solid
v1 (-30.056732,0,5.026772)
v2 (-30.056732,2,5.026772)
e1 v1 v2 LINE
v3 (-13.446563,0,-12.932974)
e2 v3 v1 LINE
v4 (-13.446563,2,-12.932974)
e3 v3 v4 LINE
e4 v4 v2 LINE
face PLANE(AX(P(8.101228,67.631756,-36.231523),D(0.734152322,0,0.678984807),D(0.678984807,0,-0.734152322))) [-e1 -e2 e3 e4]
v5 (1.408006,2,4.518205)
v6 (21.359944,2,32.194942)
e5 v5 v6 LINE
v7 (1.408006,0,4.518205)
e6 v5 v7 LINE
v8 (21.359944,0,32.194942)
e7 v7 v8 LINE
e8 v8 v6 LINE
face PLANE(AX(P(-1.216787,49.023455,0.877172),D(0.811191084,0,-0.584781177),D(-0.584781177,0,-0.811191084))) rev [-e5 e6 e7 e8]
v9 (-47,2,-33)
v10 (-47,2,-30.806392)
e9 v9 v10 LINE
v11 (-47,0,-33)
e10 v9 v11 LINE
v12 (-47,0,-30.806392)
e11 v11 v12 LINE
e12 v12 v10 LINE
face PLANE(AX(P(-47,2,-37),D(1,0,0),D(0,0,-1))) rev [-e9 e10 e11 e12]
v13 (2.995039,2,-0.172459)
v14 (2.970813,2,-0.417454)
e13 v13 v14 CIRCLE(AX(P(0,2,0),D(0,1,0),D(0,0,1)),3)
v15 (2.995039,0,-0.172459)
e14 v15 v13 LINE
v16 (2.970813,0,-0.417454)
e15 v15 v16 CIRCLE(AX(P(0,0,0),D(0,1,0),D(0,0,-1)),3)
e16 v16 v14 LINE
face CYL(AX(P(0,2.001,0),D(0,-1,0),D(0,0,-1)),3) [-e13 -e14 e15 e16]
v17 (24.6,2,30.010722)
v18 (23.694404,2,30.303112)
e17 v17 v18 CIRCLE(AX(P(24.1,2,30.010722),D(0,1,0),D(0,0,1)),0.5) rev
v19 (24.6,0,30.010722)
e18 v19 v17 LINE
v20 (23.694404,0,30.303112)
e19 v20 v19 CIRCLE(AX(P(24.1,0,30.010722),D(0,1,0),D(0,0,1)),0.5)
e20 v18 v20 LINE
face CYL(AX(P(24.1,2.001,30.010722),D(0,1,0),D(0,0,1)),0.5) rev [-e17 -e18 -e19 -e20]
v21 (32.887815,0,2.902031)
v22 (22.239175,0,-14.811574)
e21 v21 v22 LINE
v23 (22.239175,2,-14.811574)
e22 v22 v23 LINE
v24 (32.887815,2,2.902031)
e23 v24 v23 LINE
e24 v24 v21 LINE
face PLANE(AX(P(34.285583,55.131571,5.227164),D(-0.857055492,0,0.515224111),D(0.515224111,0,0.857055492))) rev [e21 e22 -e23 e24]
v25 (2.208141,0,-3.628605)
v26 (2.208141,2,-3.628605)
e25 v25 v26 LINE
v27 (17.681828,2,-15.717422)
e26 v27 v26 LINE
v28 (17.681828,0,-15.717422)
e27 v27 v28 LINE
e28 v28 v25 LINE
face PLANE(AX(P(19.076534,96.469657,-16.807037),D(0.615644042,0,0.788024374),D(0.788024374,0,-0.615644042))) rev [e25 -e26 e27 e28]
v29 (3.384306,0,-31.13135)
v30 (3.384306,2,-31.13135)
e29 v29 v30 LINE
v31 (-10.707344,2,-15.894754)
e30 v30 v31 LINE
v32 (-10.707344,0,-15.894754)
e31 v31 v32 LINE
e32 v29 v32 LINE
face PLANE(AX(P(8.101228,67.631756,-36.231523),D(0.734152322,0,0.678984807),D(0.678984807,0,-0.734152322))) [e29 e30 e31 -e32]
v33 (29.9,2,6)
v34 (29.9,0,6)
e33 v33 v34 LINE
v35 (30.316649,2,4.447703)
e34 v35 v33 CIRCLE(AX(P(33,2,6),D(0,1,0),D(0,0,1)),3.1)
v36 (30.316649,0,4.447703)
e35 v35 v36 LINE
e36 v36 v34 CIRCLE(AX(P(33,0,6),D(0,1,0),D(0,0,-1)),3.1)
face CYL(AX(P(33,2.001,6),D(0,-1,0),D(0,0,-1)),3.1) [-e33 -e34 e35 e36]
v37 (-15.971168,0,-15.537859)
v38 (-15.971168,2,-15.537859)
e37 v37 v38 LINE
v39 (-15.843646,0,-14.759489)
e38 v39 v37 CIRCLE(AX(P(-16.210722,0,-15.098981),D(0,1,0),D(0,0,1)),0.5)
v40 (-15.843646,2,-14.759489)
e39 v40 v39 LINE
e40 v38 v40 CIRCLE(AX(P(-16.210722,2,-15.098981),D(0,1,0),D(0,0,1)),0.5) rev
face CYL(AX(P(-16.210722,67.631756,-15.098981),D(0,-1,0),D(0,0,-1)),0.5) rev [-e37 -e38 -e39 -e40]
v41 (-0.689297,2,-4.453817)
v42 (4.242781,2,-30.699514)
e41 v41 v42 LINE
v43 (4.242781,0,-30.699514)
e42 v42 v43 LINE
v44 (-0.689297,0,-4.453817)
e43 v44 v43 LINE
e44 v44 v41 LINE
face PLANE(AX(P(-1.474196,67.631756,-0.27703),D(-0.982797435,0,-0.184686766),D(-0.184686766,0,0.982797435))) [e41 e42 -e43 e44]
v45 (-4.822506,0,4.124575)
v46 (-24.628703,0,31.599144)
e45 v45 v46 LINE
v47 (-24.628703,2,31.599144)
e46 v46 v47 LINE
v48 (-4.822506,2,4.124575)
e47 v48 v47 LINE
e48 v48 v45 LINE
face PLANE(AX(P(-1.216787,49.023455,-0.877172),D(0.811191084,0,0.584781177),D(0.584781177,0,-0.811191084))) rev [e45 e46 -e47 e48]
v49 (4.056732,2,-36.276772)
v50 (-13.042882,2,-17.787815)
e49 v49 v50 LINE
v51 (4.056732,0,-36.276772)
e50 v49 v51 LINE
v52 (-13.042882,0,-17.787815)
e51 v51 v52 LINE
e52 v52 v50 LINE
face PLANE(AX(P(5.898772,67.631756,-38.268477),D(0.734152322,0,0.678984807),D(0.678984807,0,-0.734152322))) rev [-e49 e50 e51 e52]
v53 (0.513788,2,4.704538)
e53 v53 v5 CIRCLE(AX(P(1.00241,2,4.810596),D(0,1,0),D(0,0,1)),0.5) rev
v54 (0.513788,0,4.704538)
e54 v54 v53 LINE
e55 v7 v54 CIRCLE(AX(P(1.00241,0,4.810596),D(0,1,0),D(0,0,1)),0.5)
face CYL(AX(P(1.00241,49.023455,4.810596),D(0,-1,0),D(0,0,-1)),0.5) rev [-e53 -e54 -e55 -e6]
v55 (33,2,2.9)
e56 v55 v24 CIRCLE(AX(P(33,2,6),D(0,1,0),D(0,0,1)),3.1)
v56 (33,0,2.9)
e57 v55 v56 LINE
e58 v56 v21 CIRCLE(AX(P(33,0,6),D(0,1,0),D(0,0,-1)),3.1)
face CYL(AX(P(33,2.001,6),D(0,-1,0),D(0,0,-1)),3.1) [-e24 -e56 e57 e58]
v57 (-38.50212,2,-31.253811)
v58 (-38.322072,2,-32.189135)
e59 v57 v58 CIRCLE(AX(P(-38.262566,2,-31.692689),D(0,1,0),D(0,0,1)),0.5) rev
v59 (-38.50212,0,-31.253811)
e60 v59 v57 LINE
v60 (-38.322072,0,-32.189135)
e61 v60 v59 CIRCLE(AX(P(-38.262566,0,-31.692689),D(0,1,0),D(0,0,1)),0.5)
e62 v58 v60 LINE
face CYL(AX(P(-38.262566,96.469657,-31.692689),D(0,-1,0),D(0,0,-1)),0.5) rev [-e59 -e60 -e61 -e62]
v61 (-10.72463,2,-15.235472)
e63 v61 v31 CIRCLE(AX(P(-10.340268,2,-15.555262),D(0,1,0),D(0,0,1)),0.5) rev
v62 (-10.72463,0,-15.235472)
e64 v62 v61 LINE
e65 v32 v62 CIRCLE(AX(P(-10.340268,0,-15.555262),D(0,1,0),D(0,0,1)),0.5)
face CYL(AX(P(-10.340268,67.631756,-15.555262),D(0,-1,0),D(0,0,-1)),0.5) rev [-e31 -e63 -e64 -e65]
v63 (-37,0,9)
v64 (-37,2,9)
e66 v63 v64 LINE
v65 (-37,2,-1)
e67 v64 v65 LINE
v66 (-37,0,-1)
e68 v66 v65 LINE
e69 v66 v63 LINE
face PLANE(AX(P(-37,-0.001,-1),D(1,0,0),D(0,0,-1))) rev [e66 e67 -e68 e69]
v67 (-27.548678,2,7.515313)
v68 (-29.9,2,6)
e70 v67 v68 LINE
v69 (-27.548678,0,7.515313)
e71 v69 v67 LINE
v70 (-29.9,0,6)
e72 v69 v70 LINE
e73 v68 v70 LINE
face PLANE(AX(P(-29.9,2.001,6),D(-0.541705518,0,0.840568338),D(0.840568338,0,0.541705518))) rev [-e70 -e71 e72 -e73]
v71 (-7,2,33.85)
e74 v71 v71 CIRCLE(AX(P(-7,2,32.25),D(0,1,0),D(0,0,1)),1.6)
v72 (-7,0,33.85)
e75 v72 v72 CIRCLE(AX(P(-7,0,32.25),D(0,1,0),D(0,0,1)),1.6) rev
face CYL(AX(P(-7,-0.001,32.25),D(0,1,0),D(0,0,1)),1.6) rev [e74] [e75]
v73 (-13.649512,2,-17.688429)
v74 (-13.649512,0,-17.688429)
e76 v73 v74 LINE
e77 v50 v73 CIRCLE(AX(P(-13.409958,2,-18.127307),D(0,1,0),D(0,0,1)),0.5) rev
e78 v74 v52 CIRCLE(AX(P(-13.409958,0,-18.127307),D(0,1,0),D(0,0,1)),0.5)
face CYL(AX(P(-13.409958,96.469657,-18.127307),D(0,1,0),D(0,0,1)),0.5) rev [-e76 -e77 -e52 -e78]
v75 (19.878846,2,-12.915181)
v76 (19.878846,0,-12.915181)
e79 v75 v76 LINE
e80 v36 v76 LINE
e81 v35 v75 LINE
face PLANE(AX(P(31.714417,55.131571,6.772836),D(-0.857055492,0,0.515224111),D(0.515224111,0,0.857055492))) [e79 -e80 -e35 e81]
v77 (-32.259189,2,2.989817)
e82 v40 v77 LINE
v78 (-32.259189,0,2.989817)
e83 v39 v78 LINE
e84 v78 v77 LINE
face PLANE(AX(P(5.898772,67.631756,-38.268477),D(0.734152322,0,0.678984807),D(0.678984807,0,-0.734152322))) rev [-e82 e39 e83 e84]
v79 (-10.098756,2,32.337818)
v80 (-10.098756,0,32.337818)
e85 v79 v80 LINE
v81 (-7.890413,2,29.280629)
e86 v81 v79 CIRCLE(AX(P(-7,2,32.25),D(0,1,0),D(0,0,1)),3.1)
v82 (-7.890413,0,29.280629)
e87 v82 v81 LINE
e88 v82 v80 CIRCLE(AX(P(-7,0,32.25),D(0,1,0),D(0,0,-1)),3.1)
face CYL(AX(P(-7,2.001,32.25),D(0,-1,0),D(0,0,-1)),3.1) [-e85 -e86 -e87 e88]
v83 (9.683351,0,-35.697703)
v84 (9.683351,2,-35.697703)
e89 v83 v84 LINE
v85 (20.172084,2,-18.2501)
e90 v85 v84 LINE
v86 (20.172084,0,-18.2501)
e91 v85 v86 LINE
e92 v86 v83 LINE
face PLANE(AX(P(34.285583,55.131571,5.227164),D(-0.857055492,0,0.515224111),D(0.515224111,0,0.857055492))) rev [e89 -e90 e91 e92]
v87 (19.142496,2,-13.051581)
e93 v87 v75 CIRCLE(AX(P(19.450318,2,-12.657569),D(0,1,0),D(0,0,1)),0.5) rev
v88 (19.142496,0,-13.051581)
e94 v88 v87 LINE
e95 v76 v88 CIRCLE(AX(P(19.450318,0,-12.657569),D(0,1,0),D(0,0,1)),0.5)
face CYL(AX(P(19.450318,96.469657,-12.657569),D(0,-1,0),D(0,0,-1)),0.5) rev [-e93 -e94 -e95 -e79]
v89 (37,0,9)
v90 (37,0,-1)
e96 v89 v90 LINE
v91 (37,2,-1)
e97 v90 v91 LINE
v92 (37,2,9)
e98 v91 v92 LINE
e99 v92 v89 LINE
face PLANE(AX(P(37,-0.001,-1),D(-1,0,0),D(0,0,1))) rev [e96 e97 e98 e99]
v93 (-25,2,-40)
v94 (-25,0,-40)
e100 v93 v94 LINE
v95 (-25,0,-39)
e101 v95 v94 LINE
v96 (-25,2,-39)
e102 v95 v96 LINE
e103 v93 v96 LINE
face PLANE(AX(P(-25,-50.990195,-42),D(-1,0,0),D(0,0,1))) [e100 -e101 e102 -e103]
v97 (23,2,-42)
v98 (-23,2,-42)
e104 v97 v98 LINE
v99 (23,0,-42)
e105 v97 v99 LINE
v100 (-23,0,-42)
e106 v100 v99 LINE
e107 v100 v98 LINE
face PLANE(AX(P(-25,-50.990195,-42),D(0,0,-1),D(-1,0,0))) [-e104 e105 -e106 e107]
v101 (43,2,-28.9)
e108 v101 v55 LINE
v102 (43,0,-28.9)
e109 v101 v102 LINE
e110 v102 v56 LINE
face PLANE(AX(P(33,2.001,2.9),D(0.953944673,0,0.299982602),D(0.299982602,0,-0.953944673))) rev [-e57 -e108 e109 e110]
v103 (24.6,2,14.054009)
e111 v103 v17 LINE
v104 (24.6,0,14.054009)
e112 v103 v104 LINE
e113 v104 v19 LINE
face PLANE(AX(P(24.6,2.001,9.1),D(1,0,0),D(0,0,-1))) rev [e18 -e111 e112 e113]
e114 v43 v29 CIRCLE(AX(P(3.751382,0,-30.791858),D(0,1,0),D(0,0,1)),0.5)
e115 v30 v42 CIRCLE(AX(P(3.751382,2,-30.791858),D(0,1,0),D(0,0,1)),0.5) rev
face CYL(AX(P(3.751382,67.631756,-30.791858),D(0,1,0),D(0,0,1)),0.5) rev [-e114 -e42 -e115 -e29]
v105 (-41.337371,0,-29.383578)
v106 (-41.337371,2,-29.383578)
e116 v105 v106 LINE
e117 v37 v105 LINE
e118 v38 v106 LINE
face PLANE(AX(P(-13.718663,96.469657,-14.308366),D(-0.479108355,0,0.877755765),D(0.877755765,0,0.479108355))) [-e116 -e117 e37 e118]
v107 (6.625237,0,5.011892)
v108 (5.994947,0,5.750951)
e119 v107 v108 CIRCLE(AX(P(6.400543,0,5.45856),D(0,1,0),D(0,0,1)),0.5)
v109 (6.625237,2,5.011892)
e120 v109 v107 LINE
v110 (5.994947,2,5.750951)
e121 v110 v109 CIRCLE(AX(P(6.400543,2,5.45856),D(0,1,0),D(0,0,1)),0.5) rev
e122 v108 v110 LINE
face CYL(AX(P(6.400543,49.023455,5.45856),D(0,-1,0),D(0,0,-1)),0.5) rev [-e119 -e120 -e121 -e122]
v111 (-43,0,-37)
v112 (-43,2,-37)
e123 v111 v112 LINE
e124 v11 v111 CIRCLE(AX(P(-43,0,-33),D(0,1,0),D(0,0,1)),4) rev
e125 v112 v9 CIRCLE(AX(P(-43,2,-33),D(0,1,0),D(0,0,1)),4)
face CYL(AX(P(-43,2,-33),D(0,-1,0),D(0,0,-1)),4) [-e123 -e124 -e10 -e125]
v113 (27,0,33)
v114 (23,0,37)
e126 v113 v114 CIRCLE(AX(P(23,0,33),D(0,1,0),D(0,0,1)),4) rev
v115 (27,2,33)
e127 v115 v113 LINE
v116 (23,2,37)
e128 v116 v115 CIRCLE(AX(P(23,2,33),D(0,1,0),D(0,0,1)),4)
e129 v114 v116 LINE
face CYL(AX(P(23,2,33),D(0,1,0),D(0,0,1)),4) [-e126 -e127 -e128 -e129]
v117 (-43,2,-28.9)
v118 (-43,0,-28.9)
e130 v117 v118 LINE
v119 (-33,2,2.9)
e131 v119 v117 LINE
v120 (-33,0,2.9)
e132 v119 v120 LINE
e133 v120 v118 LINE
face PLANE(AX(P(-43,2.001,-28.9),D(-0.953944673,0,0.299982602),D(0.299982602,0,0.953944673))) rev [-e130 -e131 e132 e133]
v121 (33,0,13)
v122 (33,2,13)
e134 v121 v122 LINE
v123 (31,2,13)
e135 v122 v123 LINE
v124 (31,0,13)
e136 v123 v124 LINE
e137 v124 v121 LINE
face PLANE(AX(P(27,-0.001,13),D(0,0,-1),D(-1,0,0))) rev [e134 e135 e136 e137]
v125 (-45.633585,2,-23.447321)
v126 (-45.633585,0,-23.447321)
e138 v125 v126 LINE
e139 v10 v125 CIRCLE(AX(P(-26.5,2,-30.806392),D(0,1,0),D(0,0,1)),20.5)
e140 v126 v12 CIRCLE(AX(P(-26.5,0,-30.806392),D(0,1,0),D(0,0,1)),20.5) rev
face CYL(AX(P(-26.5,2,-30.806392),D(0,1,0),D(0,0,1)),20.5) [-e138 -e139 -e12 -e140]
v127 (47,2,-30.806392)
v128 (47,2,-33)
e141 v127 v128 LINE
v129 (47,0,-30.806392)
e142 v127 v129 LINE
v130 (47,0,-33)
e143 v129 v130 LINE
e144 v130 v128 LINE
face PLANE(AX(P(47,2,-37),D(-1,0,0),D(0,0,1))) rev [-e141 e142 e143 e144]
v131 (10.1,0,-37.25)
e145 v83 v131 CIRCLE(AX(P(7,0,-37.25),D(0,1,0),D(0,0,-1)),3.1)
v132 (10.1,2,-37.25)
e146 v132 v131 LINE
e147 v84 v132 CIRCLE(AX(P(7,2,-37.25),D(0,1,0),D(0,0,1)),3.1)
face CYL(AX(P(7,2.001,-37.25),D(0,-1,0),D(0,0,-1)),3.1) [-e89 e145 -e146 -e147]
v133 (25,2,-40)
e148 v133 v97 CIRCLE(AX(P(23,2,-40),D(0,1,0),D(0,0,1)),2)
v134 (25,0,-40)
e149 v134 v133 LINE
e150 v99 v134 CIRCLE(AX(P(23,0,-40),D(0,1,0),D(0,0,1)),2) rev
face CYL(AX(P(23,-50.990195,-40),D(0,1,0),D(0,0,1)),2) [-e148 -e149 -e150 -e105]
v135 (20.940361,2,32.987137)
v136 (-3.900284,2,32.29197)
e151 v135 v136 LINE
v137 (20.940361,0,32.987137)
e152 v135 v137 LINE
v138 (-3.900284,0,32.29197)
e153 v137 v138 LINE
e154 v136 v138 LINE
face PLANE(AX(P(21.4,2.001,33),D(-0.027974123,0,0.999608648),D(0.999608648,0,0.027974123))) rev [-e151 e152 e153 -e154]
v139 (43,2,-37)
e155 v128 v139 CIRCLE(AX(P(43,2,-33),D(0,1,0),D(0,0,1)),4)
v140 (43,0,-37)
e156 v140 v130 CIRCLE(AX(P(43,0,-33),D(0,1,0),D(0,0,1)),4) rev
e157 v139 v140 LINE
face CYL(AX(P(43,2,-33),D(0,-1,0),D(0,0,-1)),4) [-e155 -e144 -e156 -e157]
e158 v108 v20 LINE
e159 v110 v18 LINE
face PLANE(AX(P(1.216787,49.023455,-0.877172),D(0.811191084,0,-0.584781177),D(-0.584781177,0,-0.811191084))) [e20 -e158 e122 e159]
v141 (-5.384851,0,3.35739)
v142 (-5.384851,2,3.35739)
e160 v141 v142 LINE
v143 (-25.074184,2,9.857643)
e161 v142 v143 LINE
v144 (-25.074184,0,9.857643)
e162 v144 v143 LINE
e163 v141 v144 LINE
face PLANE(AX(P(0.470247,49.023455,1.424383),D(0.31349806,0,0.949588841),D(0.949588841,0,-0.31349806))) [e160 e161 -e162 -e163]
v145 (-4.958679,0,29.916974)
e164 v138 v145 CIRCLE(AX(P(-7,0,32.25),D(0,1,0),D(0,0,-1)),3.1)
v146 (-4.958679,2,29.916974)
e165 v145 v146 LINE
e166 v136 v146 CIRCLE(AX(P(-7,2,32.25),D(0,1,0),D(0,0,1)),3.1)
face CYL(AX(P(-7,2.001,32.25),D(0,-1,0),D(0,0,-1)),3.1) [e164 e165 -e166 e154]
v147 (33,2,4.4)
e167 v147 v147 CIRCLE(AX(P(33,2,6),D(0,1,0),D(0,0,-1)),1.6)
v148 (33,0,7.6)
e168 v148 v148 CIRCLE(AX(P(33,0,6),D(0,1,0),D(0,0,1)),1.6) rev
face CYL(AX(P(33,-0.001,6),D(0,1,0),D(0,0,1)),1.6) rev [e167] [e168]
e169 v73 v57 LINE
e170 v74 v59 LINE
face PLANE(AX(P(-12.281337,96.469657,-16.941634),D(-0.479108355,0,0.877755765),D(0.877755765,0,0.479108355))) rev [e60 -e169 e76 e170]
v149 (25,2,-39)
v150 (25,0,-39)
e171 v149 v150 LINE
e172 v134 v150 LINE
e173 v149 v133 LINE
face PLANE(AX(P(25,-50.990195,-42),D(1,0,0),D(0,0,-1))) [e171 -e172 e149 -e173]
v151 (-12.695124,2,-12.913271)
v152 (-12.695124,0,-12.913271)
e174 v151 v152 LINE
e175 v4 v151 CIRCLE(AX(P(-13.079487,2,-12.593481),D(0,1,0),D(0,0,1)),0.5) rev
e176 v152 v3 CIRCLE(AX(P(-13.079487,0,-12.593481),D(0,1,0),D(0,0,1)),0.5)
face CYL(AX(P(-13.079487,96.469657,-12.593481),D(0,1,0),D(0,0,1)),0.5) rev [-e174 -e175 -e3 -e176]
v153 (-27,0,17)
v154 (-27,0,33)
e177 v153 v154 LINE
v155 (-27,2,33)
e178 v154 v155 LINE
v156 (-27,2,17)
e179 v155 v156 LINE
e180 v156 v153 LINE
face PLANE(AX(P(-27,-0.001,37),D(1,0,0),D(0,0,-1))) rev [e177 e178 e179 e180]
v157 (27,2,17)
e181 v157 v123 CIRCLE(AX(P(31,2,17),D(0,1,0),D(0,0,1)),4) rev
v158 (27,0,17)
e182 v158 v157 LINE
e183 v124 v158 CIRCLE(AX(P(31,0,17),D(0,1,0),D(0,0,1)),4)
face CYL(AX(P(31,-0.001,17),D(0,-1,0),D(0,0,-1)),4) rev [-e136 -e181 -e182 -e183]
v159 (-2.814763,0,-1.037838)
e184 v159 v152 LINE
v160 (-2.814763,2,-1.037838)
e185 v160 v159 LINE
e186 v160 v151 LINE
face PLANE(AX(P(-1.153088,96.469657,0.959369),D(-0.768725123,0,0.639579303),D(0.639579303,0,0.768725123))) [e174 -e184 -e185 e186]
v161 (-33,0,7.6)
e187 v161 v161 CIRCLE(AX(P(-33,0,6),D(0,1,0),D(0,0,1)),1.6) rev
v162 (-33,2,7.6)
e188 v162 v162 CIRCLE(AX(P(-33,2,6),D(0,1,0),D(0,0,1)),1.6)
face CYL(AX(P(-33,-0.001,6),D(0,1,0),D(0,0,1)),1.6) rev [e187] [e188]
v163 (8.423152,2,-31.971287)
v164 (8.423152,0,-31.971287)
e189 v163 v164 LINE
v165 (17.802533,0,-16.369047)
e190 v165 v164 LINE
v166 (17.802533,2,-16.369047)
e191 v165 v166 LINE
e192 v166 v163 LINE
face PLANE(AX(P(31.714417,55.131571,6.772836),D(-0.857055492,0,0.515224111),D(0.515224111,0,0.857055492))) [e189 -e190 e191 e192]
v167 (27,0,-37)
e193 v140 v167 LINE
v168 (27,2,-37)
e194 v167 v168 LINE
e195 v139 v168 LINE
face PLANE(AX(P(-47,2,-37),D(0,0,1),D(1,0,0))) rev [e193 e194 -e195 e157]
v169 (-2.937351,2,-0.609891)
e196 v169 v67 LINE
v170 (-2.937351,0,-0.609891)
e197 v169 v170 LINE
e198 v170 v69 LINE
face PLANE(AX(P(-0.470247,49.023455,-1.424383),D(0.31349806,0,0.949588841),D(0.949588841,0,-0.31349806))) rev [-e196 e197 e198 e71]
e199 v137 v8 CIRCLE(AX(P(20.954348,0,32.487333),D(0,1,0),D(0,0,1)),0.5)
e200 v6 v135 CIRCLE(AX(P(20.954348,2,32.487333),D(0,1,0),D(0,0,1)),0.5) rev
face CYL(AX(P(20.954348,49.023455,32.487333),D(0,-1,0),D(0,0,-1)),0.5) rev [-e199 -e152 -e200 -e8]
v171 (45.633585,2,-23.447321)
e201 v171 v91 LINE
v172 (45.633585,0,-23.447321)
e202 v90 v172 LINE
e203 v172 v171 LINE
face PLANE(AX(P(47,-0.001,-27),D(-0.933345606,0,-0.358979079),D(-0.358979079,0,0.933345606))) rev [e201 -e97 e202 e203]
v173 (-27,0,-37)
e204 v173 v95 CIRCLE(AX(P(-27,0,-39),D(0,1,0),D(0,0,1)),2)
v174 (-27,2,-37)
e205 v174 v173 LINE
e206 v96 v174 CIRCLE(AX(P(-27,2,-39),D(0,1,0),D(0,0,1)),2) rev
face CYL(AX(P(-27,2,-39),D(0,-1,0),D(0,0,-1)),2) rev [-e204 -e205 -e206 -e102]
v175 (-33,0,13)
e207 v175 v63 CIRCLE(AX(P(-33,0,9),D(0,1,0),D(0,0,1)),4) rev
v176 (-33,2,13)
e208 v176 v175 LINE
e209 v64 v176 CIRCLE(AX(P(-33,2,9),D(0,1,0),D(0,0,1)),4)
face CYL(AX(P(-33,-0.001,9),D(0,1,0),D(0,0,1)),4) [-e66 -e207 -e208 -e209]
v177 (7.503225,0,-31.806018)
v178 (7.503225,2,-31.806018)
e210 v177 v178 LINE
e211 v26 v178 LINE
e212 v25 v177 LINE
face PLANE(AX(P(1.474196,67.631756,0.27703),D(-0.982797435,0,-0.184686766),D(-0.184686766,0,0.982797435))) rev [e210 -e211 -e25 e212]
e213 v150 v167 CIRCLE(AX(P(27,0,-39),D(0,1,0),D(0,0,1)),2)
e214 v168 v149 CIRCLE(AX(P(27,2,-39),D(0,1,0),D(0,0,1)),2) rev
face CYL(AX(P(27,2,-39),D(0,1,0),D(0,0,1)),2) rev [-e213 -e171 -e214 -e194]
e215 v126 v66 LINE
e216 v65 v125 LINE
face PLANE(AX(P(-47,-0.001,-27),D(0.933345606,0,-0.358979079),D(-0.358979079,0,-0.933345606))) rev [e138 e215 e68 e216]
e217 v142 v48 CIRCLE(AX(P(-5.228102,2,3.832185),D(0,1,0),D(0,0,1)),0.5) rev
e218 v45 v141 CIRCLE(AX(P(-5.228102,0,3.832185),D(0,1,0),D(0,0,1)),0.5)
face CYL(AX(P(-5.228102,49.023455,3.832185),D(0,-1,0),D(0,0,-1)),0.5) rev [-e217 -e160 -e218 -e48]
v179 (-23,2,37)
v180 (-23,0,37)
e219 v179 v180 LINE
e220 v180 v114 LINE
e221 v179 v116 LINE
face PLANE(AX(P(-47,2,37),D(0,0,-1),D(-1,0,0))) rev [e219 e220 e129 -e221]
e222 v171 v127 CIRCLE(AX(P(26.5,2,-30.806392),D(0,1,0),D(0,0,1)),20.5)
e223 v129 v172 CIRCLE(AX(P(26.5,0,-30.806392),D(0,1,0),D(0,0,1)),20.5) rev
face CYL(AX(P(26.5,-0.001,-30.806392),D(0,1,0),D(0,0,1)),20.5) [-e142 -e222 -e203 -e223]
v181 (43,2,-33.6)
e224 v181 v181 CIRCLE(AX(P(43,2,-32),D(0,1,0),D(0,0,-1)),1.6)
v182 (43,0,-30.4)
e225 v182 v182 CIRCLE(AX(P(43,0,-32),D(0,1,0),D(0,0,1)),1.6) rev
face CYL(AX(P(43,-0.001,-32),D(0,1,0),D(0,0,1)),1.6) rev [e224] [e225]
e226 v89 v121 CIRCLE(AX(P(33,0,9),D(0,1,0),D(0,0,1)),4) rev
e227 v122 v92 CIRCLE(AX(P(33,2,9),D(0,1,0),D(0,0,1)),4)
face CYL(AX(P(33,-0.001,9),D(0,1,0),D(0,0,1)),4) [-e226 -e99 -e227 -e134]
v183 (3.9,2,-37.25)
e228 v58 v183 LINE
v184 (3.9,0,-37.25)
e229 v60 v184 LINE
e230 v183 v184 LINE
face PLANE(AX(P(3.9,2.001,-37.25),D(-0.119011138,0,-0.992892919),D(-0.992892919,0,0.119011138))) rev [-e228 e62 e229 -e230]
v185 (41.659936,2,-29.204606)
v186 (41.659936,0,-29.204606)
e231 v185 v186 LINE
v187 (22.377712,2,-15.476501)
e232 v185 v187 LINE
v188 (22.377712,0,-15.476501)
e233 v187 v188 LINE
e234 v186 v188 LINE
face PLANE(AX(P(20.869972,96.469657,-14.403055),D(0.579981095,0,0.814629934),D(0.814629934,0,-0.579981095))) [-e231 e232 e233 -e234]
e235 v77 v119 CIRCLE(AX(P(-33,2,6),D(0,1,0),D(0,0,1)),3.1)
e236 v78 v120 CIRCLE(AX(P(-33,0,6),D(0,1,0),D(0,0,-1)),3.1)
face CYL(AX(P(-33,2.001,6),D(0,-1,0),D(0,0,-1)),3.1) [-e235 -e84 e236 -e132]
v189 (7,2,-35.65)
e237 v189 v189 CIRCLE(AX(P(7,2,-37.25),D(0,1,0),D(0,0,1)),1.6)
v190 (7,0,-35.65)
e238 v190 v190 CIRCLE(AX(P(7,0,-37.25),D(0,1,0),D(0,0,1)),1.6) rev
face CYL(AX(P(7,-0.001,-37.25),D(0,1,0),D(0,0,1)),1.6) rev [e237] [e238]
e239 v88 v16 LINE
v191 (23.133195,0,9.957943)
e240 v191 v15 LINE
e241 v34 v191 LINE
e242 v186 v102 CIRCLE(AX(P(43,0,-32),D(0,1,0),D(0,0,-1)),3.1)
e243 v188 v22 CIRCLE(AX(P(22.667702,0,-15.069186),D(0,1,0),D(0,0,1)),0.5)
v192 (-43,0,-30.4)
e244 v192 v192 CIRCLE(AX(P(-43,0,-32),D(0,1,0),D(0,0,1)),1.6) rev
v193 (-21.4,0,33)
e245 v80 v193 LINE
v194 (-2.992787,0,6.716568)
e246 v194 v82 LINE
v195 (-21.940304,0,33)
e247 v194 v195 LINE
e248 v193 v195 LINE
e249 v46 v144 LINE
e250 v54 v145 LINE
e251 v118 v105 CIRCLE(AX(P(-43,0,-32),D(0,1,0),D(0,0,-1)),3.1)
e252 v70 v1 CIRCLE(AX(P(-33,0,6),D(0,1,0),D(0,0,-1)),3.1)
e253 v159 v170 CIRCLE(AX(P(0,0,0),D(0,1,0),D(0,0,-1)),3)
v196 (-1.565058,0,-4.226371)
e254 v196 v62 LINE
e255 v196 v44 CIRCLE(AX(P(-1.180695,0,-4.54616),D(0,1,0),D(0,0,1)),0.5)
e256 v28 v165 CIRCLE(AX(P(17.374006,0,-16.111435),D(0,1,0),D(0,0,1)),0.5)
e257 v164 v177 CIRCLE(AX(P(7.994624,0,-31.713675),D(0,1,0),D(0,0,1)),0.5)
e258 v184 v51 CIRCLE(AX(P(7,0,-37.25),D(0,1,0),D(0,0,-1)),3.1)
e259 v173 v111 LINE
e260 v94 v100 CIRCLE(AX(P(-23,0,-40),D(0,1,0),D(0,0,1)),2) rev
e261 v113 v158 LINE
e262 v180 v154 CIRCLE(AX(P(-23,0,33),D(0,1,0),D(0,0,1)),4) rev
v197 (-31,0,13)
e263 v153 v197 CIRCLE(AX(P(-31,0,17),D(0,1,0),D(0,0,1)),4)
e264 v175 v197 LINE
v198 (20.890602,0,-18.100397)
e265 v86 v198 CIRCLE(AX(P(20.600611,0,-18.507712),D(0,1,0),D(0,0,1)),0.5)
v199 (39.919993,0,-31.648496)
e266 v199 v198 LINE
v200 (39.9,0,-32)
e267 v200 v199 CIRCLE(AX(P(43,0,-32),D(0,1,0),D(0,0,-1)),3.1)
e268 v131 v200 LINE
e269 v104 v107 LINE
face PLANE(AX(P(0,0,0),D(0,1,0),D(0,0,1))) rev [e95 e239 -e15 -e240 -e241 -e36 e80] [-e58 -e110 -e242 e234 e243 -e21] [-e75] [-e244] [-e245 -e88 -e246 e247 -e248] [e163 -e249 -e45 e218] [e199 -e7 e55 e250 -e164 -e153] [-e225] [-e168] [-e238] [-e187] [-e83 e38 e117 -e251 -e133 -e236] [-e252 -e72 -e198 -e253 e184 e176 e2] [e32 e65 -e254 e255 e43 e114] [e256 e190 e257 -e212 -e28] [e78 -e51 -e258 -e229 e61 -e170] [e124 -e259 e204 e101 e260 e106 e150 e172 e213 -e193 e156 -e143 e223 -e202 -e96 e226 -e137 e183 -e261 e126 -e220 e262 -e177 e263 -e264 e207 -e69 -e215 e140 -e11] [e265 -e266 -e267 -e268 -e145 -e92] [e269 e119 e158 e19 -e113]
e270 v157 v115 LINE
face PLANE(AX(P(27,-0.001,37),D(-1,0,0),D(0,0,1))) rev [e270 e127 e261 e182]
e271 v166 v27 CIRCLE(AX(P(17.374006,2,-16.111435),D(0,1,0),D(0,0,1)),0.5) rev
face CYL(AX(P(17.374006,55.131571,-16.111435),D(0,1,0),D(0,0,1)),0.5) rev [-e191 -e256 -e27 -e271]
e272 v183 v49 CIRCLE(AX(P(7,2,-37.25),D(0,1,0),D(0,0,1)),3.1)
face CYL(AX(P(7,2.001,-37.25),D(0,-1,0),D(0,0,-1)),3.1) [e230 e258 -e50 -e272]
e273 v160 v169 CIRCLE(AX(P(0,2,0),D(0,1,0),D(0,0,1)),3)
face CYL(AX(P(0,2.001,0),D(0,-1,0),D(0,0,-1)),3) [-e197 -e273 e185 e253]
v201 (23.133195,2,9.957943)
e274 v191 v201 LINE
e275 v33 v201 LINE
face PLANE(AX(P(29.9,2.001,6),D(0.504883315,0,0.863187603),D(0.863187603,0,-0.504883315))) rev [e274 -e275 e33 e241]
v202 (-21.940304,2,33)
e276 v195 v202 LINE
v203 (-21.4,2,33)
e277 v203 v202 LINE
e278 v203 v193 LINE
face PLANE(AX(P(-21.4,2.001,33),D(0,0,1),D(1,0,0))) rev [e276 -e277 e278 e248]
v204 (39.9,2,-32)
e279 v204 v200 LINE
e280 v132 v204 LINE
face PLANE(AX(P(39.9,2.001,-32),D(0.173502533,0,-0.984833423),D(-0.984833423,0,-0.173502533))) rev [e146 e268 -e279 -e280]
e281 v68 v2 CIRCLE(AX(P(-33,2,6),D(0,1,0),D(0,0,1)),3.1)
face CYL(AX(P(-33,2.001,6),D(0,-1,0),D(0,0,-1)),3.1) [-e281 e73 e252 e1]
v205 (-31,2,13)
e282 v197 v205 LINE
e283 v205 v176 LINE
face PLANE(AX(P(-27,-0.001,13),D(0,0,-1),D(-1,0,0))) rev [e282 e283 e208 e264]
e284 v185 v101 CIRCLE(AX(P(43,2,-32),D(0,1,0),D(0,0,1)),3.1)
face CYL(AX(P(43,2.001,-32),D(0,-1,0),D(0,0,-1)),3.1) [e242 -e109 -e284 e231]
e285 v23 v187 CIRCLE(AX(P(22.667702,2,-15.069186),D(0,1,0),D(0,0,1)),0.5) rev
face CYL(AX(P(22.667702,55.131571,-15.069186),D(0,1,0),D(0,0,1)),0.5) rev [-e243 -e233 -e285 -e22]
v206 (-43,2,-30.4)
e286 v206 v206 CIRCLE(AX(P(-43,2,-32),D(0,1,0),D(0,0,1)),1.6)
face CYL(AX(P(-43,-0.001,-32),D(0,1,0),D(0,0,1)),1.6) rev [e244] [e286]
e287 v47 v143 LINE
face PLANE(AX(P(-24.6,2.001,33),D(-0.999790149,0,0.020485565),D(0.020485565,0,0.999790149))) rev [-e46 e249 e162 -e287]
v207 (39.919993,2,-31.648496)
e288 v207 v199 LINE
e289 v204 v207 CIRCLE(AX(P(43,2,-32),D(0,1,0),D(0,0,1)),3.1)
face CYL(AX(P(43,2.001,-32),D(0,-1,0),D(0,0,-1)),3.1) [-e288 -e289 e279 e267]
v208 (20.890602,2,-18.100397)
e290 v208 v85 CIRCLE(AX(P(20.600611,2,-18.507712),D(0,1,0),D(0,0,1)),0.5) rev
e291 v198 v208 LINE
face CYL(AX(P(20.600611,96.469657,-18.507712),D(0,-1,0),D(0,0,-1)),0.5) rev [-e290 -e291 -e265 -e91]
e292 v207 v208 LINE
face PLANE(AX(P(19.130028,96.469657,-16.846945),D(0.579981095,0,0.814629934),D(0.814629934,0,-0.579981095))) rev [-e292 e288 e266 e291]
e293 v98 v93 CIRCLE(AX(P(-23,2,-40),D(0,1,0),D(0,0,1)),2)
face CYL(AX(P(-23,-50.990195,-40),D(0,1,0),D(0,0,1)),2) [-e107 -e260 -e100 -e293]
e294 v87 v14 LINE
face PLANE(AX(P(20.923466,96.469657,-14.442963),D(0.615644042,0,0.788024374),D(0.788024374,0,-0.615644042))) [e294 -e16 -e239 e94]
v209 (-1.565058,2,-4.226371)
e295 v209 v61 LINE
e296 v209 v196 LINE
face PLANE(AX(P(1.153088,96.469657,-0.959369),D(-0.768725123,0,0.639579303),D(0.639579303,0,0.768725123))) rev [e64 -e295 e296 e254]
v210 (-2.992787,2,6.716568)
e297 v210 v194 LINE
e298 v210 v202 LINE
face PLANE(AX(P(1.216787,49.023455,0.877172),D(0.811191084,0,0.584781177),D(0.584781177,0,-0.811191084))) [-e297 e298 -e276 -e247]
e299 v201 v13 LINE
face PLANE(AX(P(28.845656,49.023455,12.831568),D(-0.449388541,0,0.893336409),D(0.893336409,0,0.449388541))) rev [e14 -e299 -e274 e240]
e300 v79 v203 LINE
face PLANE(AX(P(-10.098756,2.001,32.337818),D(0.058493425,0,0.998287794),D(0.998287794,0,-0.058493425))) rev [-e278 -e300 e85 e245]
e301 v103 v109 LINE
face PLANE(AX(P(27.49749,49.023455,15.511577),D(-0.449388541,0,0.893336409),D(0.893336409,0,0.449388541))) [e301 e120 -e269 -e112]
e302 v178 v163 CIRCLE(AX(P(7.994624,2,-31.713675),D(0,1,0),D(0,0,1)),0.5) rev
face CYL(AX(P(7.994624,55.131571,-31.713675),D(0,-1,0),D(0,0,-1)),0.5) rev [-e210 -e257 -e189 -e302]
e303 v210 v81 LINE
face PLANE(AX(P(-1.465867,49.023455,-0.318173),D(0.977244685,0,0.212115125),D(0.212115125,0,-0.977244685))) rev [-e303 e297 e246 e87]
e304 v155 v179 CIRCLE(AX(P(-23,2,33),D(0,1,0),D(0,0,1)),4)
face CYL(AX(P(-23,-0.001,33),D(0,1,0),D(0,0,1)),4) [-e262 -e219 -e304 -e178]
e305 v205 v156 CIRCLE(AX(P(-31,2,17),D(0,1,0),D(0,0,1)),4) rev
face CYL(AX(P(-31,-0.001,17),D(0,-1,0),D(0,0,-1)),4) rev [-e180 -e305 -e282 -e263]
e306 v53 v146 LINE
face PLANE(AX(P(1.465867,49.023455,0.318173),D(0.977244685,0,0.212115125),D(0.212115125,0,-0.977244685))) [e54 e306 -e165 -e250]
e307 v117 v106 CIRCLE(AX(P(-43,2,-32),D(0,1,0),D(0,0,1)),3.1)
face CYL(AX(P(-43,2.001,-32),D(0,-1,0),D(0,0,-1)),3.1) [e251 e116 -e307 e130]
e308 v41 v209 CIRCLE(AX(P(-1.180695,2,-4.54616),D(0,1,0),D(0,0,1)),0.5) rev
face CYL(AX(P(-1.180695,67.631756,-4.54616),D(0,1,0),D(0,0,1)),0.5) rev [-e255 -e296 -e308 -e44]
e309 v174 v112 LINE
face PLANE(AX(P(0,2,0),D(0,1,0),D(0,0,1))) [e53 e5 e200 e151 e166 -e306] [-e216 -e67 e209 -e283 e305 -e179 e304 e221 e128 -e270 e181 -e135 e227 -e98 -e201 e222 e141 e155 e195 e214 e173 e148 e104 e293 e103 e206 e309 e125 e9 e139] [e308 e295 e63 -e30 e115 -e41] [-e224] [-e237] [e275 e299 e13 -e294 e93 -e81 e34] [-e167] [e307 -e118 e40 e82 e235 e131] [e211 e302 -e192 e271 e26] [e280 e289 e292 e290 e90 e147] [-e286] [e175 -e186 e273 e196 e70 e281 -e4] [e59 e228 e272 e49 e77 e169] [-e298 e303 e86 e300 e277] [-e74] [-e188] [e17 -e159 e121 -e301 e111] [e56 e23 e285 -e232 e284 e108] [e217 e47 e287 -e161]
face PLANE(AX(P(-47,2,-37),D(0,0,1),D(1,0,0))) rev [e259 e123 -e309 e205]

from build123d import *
from build123d.topology import SkipClean

# Parameters (mm, degrees)
SKETCH_1_W           = 94
SKETCH_1_H           = 74
EXTRUDE_1_DEPTH      = 2
CUT_EXTRUDE_1_REACH  = 61.85
SKETCH_2_R           = 1.6
CUT_EXTRUDE_2_REACH  = 61.85
CUT_EXTRUDE_3_REACH  = 61.85
SKETCH_4_W           = 10
SKETCH_4_H           = 24
FILLET_1_R           = 4
FILLET_2_R           = 4
CUT_EXTRUDE_4_REACH  = 61.85
SKETCH_5_R           = 1.6
SKETCH_7_W           = 50
SKETCH_7_H           = 10
EXTRUDE_2_DEPTH      = 2
FILLET_3_R           = 2
CUT_EXTRUDE_6_REACH  = 65.063
SKETCH_8_R           = 1.6
CUT_EXTRUDE_7_REACH  = 65.063
EXTRUDE_1_2_DEPTH    = 2
EXTRUDE_2_2_DEPTH    = 2
CUT_EXTRUDE_8_REACH  = 65.126
SKETCH_12_R          = 1.6
EXTRUDE_3_DEPTH      = 2
CUT_EXTRUDE_10_REACH = 65.126
EXTRUDE_START        = -2
EXTRUDE_4_DEPTH      = 2
EXTRUDE_3_2_DEPTH    = 2
CUT_EXTRUDE_11_REACH = 65.126
SKETCH_17_R          = 1.6
CUT_EXTRUDE_12_REACH = 65.126
SKETCH_18_R          = 1.6
CUT_EXTRUDE_START    = -2
CUT_EXTRUDE_13_DEPTH = 2
FILLET_4_R           = 0.5
FILLET_5_R           = 20.5


# Read off the part's stored shape, not the designer's step: 拉伸-薄壁4
with BuildPart() as part:
    # 草图1 → Extrude 1 (new body)
    with BuildSketch(Plane(origin=(0, 0, 0), x_dir=(1, 0, 0), z_dir=(0, 1, 0))):
        Rectangle(SKETCH_1_W, SKETCH_1_H)
    extrude(amount=EXTRUDE_1_DEPTH)

    # 草图2 → 切除-拉伸1 (cut, up to next)
    with BuildSketch(Plane(origin=(0, 2, 0), x_dir=(1, 0, 0), z_dir=(0, 1, 0)), mode=Mode.PRIVATE) as cut_extrude_1_sk1:
        with Locations(Location((-43, 32, 0), (0, 0, 270))):
            Circle(SKETCH_2_R)
    cut_extrude_1_tool1 = extrude(cut_extrude_1_sk1.sketch, amount=-CUT_EXTRUDE_1_REACH, mode=Mode.PRIVATE) & part.part
    # 草图2 → 切除-拉伸1 (cut, up to next)
    with BuildSketch(Plane(origin=(0, 2, 0), x_dir=(1, 0, 0), z_dir=(0, 1, 0)), mode=Mode.PRIVATE) as cut_extrude_1_sk2:
        with Locations(Location((43, 32, 0), (0, 0, 270))):
            Circle(SKETCH_2_R)
    cut_extrude_1_tool2 = extrude(cut_extrude_1_sk2.sketch, amount=-CUT_EXTRUDE_1_REACH, mode=Mode.PRIVATE) & part.part
    add(cut_extrude_1_tool1.solids().sort_by_distance((-43, 2, -32))[0], mode=Mode.SUBTRACT)
    add(cut_extrude_1_tool2.solids().sort_by_distance((43, 2, -32))[0], mode=Mode.SUBTRACT)

    # 草图3 → 切除-拉伸2 (cut, up to next)
    with BuildSketch(Plane(origin=(0, 2, 0), x_dir=(1, 0, 0), z_dir=(0, 1, 0)), mode=Mode.PRIVATE) as cut_extrude_2_sk1:
        Polygon((-47, 27), (-37, 1), (-37, -37), (-47, -37), align=None)
    cut_extrude_2_tool1 = extrude(cut_extrude_2_sk1.sketch, amount=-CUT_EXTRUDE_2_REACH, mode=Mode.PRIVATE) & part.part
    # 草图3 → 切除-拉伸2 (cut, up to next)
    with BuildSketch(Plane(origin=(0, 2, 0), x_dir=(1, 0, 0), z_dir=(0, 1, 0)), mode=Mode.PRIVATE) as cut_extrude_2_sk2:
        Polygon((37, -37), (47, -37), (47, 27), (37, 1), align=None)
    cut_extrude_2_tool2 = extrude(cut_extrude_2_sk2.sketch, amount=-CUT_EXTRUDE_2_REACH, mode=Mode.PRIVATE) & part.part
    add(cut_extrude_2_tool1.solids().sort_by_distance((-42.424837, 2, 10.947712))[0], mode=Mode.SUBTRACT)
    add(cut_extrude_2_tool2.solids().sort_by_distance((42.424837, 2, 10.947712))[0], mode=Mode.SUBTRACT)

    # 草图4 → 切除-拉伸3 (cut, up to next)
    with BuildSketch(Plane(origin=(0, 2, 0), x_dir=(1, 0, 0), z_dir=(0, 1, 0)), mode=Mode.PRIVATE) as cut_extrude_3_sk1:
        with Locations((-32, -25)):
            Rectangle(SKETCH_4_W, SKETCH_4_H)
    cut_extrude_3_tool1 = extrude(cut_extrude_3_sk1.sketch, amount=-CUT_EXTRUDE_3_REACH, mode=Mode.PRIVATE) & part.part
    # 草图4 → 切除-拉伸3 (cut, up to next)
    with BuildSketch(Plane(origin=(0, 2, 0), x_dir=(1, 0, 0), z_dir=(0, 1, 0)), mode=Mode.PRIVATE) as cut_extrude_3_sk2:
        with Locations((32, -25)):
            Rectangle(SKETCH_4_W, SKETCH_4_H)
    cut_extrude_3_tool2 = extrude(cut_extrude_3_sk2.sketch, amount=-CUT_EXTRUDE_3_REACH, mode=Mode.PRIVATE) & part.part
    add(cut_extrude_3_tool1.solids().sort_by_distance((-32, 2, 25))[0], mode=Mode.SUBTRACT)
    add(cut_extrude_3_tool2.solids().sort_by_distance((32, 2, 25))[0], mode=Mode.SUBTRACT)

    # 圆角1
    fillet_1_edges = [part.edges().sort_by_distance(p)[0] for p in [
        (-27, 1, 37),
        (27, 1, 37),
    ]]
    fillet(fillet_1_edges, radius=FILLET_1_R)

    # 圆角2
    fillet_2_edges = [part.edges().sort_by_distance(p)[0] for p in [
        (-37, 1, 13),
        (-27, 1, 13),
        (27, 1, 13),
        (37, 1, 13),
        (-47, 1, -37),
        (47, 1, -37),
    ]]
    fillet(fillet_2_edges, radius=FILLET_2_R)

    # 草图5 → 切除-拉伸4 (cut, up to next)
    with BuildSketch(Plane(origin=(0, 2, 0), x_dir=(1, 0, 0), z_dir=(0, 1, 0)), mode=Mode.PRIVATE) as cut_extrude_4_sk1:
        with Locations(Location((-33, -6, 0), (0, 0, 270))):
            Circle(SKETCH_5_R)
    cut_extrude_4_tool1 = extrude(cut_extrude_4_sk1.sketch, amount=-CUT_EXTRUDE_4_REACH, mode=Mode.PRIVATE) & part.part
    # 草图5 → 切除-拉伸4 (cut, up to next)
    with BuildSketch(Plane(origin=(0, 2, 0), x_dir=(1, 0, 0), z_dir=(0, 1, 0)), mode=Mode.PRIVATE) as cut_extrude_4_sk2:
        with Locations(Location((33, -6, 0), (0, 0, 270))):
            Circle(SKETCH_5_R)
    cut_extrude_4_tool2 = extrude(cut_extrude_4_sk2.sketch, amount=-CUT_EXTRUDE_4_REACH, mode=Mode.PRIVATE) & part.part
    add(cut_extrude_4_tool1.solids().sort_by_distance((-33, 2, 6))[0], mode=Mode.SUBTRACT)
    add(cut_extrude_4_tool2.solids().sort_by_distance((33, 2, 6))[0], mode=Mode.SUBTRACT)

    # 草图7 → Extrude 2 (add)
    with BuildSketch(Plane(origin=(0, 2, 0), x_dir=(1, 0, 0), z_dir=(0, 1, 0))):
        with Locations((0, 37)):
            Rectangle(SKETCH_7_W, SKETCH_7_H)
    extrude(amount=-EXTRUDE_2_DEPTH)

    # 圆角3
    fillet_3_edges = [part.edges().sort_by_distance(p)[0] for p in [
        (25, 1, -42),
        (25, 1, -37),
        (-25, 1, -37),
        (-25, 1, -42),
    ]]
    fillet(fillet_3_edges, radius=FILLET_3_R)

    # 草图8 → 切除-拉伸6 (cut, up to next)
    with BuildSketch(Plane(origin=(0, 2, 0), x_dir=(1, 0, 0), z_dir=(0, 1, 0)), mode=Mode.PRIVATE) as cut_extrude_6_sk1:
        with Locations(Location((7, 37.25, 0), (0, 0, 270))):
            Circle(SKETCH_8_R)
    cut_extrude_6_tool1 = extrude(cut_extrude_6_sk1.sketch, amount=-CUT_EXTRUDE_6_REACH, mode=Mode.PRIVATE) & part.part
    # 草图8 → 切除-拉伸6 (cut, up to next)
    with BuildSketch(Plane(origin=(0, 2, 0), x_dir=(1, 0, 0), z_dir=(0, 1, 0)), mode=Mode.PRIVATE) as cut_extrude_6_sk2:
        with Locations(Location((-7, -32.25, 0), (0, 0, 270))):
            Circle(SKETCH_8_R)
    cut_extrude_6_tool2 = extrude(cut_extrude_6_sk2.sketch, amount=-CUT_EXTRUDE_6_REACH, mode=Mode.PRIVATE) & part.part
    add(cut_extrude_6_tool1.solids().sort_by_distance((7, 2, -37.25))[0], mode=Mode.SUBTRACT)
    add(cut_extrude_6_tool2.solids().sort_by_distance((-7, 2, 32.25))[0], mode=Mode.SUBTRACT)

    # 草图9 → 切除-拉伸7 (cut, up to next)
    with BuildSketch(Plane.XZ, mode=Mode.PRIVATE) as cut_extrude_7_sk1:
        with BuildLine():
            Line((33, 2.9), (43, -28.9))
            ThreePointArc((43, -28.9), (40.807968978, -29.807968978), (39.9, -32))
            Line((39.9, -32), (10.1, -37.25))
            ThreePointArc((10.1, -37.25), (7, -34.15), (3.9, -37.25))
            Line((3.9, -37.25), (-39.9, -32))
            ThreePointArc((-39.9, -32), (-40.807968978, -29.807968978), (-43, -28.9))
            Line((-43, -28.9), (-33, 2.9))
            ThreePointArc((-33, 2.9), (-30.807968978, 3.807968978), (-29.9, 6))
            Line((-29.9, 6), (-3, 0))
            ThreePointArc((-3, 0), (0, -3), (3, 0))
            Line((3, 0), (29.9, 6))
            ThreePointArc((29.9, 6), (30.807968978, 3.807968978), (33, 2.9))
        make_face()
    cut_extrude_7_tool1 = extrude(cut_extrude_7_sk1.sketch, amount=-CUT_EXTRUDE_7_REACH, mode=Mode.PRIVATE) & part.part
    add(cut_extrude_7_tool1.solids().sort_by_distance((0.160682, 0, -16.717097))[0], mode=Mode.SUBTRACT)

    # 草图10 → Extrude 1 2 (add)
    with BuildSketch(Plane.XZ):
        Polygon((31.714416762, 6.772836166), (5.714416762, -36.477163834), (8.285583238, -38.022836166), (34.285583238, 5.227163834), align=None)
    extrude(amount=-EXTRUDE_1_2_DEPTH)

    # 草图11 → Extrude 2 2 (add)
    with BuildSketch(Plane.XZ):
        Polygon((-1.474196153, -0.277030149), (4.563536533, -32.406393368), (-31.898771517, 7.01847721), (-34.101228483, 4.98152279), (9.436463467, -42.093606632), (1.474196153, 0.277030149), align=None)
    extrude(amount=-EXTRUDE_2_2_DEPTH)

    # 草图12 → 切除-拉伸8 (cut, up to next)
    with BuildSketch(Plane.XZ, mode=Mode.PRIVATE) as cut_extrude_8_sk1:
        with Locations(Location((7, -37.25, 0), (0, 0, 90))):
            Circle(SKETCH_12_R)
    cut_extrude_8_tool1 = extrude(cut_extrude_8_sk1.sketch, amount=-CUT_EXTRUDE_8_REACH, mode=Mode.PRIVATE) & part.part
    # 草图12 → 切除-拉伸8 (cut, up to next)
    with BuildSketch(Plane.XZ, mode=Mode.PRIVATE) as cut_extrude_8_sk2:
        with Locations(Location((33, 6, 0), (0, 0, 90))):
            Circle(SKETCH_12_R)
    cut_extrude_8_tool2 = extrude(cut_extrude_8_sk2.sketch, amount=-CUT_EXTRUDE_8_REACH, mode=Mode.PRIVATE) & part.part
    # 草图12 → 切除-拉伸8 (cut, up to next)
    with BuildSketch(Plane.XZ, mode=Mode.PRIVATE) as cut_extrude_8_sk3:
        with Locations(Location((-33, 6, 0), (0, 0, 90))):
            Circle(SKETCH_12_R)
    cut_extrude_8_tool3 = extrude(cut_extrude_8_sk3.sketch, amount=-CUT_EXTRUDE_8_REACH, mode=Mode.PRIVATE) & part.part
    add(cut_extrude_8_tool1.solids().sort_by_distance((7, 0, -37.25))[0], mode=Mode.SUBTRACT)
    add(cut_extrude_8_tool2.solids().sort_by_distance((33, 0, 6))[0], mode=Mode.SUBTRACT)
    add(cut_extrude_8_tool3.solids().sort_by_distance((-33, 0, 6))[0], mode=Mode.SUBTRACT)

    # 草图13 → Extrude 3 (add)
    with BuildSketch(Plane.XZ):
        Polygon((-42.281337467, -33.316633648), (-12.030028979, -16.804461098), (0.222772907, -2.077535755), (19.102837119, -16.827585921), (42.130028358, -33.221944902), (43.869971642, -30.778055098), (20.897162881, -14.422414079), (-0.222772907, 2.077535755), (-13.969971021, -14.445538902), (-43.718662533, -30.683366352), align=None)
    extrude(amount=-EXTRUDE_3_DEPTH)

    # 草图14 → 切除-拉伸10 (cut, up to next)
    with BuildSketch(Plane.XZ, mode=Mode.PRIVATE) as cut_extrude_10_sk1:
        with BuildLine():
            Line((24.6, 9.1), (24.6, 33))
            Line((24.6, 33), (21.4, 33))
            Line((21.4, 33), (-3.900284118, 32.291969661))
            ThreePointArc((-3.900284118, 32.291969661), (-7.022929058, 29.150084798), (-10.098755887, 32.337817728))
            Line((-10.098755887, 32.337817728), (-21.4, 33))
            Line((-21.4, 33), (-24.6, 33))
            Line((-24.6, 33), (-25.089707761, 9.1))
            Line((-25.089707761, 9.1), (-29.9, 6))
            Line((-29.9, 6), (-3, 0))
            ThreePointArc((-3, 0), (0, 3), (3, 0))
            Line((3, 0), (29.9, 6))
            Line((29.9, 6), (24.6, 9.1))
        make_face()
    cut_extrude_10_tool1 = extrude(cut_extrude_10_sk1.sketch, amount=-CUT_EXTRUDE_10_REACH, mode=Mode.PRIVATE) & part.part
    add(cut_extrude_10_tool1.solids().sort_by_distance((-0.01036, 0, 17.191558))[0], mode=Mode.SUBTRACT)

    # 拉伸-薄壁4 outline → 拉伸-薄壁4 (add)
    with BuildSketch(Plane.XZ.offset(EXTRUDE_START)):
        with BuildLine():
            Line((-7.890413117, 29.280628942), (-2.992787477, 6.716567957))
            Line((-2.992787477, 6.716567957), (-21.940303837, 33))
            Line((-21.940303837, 33), (-24.6, 33))
            Line((-24.6, 33), (-24.628703352, 31.599143892))
            Line((-24.628703352, 31.599143892), (-3.921076206, 2.874138435))
            Line((-3.921076206, 2.874138435), (-25.074183755, 9.857643187))
            Line((-25.074183755, 9.857643187), (-25.089707761, 9.1))
            Line((-25.089707761, 9.1), (-27.548678233, 7.515312816))
            Line((-27.548678233, 7.515312816), (-2.937351268, -0.609891409))
            ThreePointArc((-2.937351268, -0.609891409), (-0.220609967, 2.991877545), (2.995038884, -0.172458936))
            Line((2.995038884, -0.172458936), (24.6, 10.695811795))
            Line((24.6, 10.695811795), (24.6, 14.054009188))
            Line((24.6, 14.054009188), (4.800407132, 4.093920184))
            Line((4.800407132, 4.093920184), (24.6, 31.559327455))
            Line((24.6, 31.559327455), (24.6, 33))
            Line((24.6, 33), (21.940303837, 33))
            Line((21.940303837, 33), (0.751807476, 3.607947046))
            Line((0.751807476, 3.607947046), (-4.958679063, 29.916974318))
            ThreePointArc((-4.958679063, 29.916974318), (-6.342443111, 29.220541478), (-7.890413117, 29.280628942))
        make_face()
        with BuildLine():
            ThreePointArc((-24.78947967, 36.577396052), (-24.688976568, 36.625928592), (-24.587158568, 36.671638283))
            Line((-24.587158568, 36.671638283), (-24.611640499, 36.705598891))
            Line((-24.611640499, 36.705598891), (-24.78947967, 36.577396052))
        make_face()
        with BuildLine():
            ThreePointArc((-26.71233249, 34.489492359), (-26.338198715, 35.203730778), (-25.828427125, 35.828427125))
            Line((-25.828427125, 35.828427125), (-27.045213751, 34.951255359))
            Line((-27.045213751, 34.951255359), (-26.71233249, 34.489492359))
        make_face()
        with BuildLine():
            ThreePointArc((-35.828427125, 11.828427125), (-35.035060609, 12.443621396), (-34.113498704, 12.841890243))
            Line((-34.113498704, 12.841890243), (-35.358180035, 13.252810386))
            Line((-35.358180035, 13.252810386), (-35.828427125, 11.828427125))
        make_face()
        with BuildLine():
            ThreePointArc((25.828427125, 35.828427125), (26.338198715, 35.203730778), (26.71233249, 34.489492359))
            Line((26.71233249, 34.489492359), (27.045213751, 34.951255359))
            Line((27.045213751, 34.951255359), (25.828427125, 35.828427125))
        make_face()
        with BuildLine():
            ThreePointArc((24.587158568, 36.671638283), (24.688976568, 36.625928592), (24.78947967, 36.577396052))
            Line((24.78947967, 36.577396052), (24.611640499, 36.705598891))
            Line((24.611640499, 36.705598891), (24.587158568, 36.671638283))
        make_face()
        with BuildLine():
            Line((28.171572875, 14.171572875), (27.497490064, 15.511577489))
            Line((27.497490064, 15.511577489), (27.323529351, 15.424067397))
            ThreePointArc((27.323529351, 15.424067397), (27.687808974, 14.757369712), (28.171572875, 14.171572875))
        make_face()
        with BuildLine():
            ThreePointArc((-8.347766323, 31.387720499), (-6.660615799, 30.686408505), (-5.41603227, 32.024065875))
            Line((-5.41603227, 32.024065875), (-5.534132973, 32.568172688))
            Line((-5.534132973, 32.568172688), (-8.465867027, 31.931827312))
            Line((-8.465867027, 31.931827312), (-8.347766323, 31.387720499))
        make_face()
    extrude(amount=EXTRUDE_4_DEPTH)

    # 草图16 → Extrude 3 2 (add)
    with BuildSketch(Plane(origin=(0, 2, 0), x_dir=(1, 0, 0), z_dir=(0, 1, 0))):
        Polygon((24.6, -9.1), (24.6, -10.695811795), (23.133194892, -9.957942611), align=None)
    extrude(amount=-EXTRUDE_3_2_DEPTH)

    # 草图17 → 切除-拉伸11 (cut, up to next)
    with BuildSketch(Plane(origin=(0, 2, 0), x_dir=(1, 0, 0), z_dir=(0, 1, 0)), mode=Mode.PRIVATE) as cut_extrude_11_sk1:
        with Locations(Location((-43, 32, 0), (0, 0, 270))):
            Circle(SKETCH_17_R)
    cut_extrude_11_tool1 = extrude(cut_extrude_11_sk1.sketch, amount=-CUT_EXTRUDE_11_REACH, mode=Mode.PRIVATE) & part.part
    # 草图17 → 切除-拉伸11 (cut, up to next)
    with BuildSketch(Plane(origin=(0, 2, 0), x_dir=(1, 0, 0), z_dir=(0, 1, 0)), mode=Mode.PRIVATE) as cut_extrude_11_sk2:
        with Locations(Location((43, 32, 0), (0, 0, 270))):
            Circle(SKETCH_17_R)
    cut_extrude_11_tool2 = extrude(cut_extrude_11_sk2.sketch, amount=-CUT_EXTRUDE_11_REACH, mode=Mode.PRIVATE) & part.part
    add(cut_extrude_11_tool1.solids().sort_by_distance((-43, 2, -32))[0], mode=Mode.SUBTRACT)
    add(cut_extrude_11_tool2.solids().sort_by_distance((43, 2, -32))[0], mode=Mode.SUBTRACT)

    # 草图18 → 切除-拉伸12 (cut, up to next)
    with BuildSketch(Plane(origin=(0, 2, 0), x_dir=(1, 0, 0), z_dir=(0, 1, 0)), mode=Mode.PRIVATE) as cut_extrude_12_sk1:
        with Locations(Location((-7, -32.25, 0), (0, 0, 270))):
            Circle(SKETCH_18_R)
    cut_extrude_12_tool1 = extrude(cut_extrude_12_sk1.sketch, amount=-CUT_EXTRUDE_12_REACH, mode=Mode.PRIVATE) & part.part
    add(cut_extrude_12_tool1.solids().sort_by_distance((-7, 2, 32.25))[0], mode=Mode.SUBTRACT)

    # 草图19 → 切除-拉伸13 (cut)
    with SkipClean():  # the faces are left unmerged after this step: merging them gives an invalid solid
        with BuildSketch(Plane(origin=(0, 2, 0), x_dir=(1, 0, 0), z_dir=(0, 1, 0)).offset(CUT_EXTRUDE_START)):
            Polygon((9.436463467, 42.093606632), (9.34989086, 42), (9.418872959, 42), align=None)
            with BuildLine():
                Line((-37, -9), (-37, -14.575213497))
                Line((-37, -14.575213497), (-33, -13))
                ThreePointArc((-33, -13), (-35.828427125, -11.828427125), (-37, -9))
            make_face()
            with BuildLine():
                Line((-27, -33), (-27.735971998, -37))
                Line((-27.735971998, -37), (-23, -37))
                ThreePointArc((-23, -37), (-25.828427125, -35.828427125), (-27, -33))
            make_face()
            with BuildLine():
                Line((23, -37), (27.995595448, -37))
                Line((27.995595448, -37), (27, -33))
                ThreePointArc((27, -33), (25.828427125, -35.828427125), (23, -37))
            make_face()
            with BuildLine():
                Line((27, -17), (31, -17))
                Line((31, -17), (31, -13))
                ThreePointArc((31, -13), (28.171572875, -14.171572875), (27, -17))
            make_face()
        extrude(amount=CUT_EXTRUDE_13_DEPTH, mode=Mode.SUBTRACT)

    # 圆角4
    fillet_4_edges = [part.edges().sort_by_distance(p)[0] for p in [
        (4.563536533, 1, -32.406393368),
        (7.745968105, 1, -33.097756312),
        (-39.874732803, 1, -32.003028602),
        (21.940303837, 1, 33),
        (24.6, 1, 31.559327455),
        (19.587738677, 1, -13.399426419),
        (18.030504302, 1, -15.989825908),
        (20.450458624, 1, -17.787033841),
        (22.00077679, 1, -15.208139199),
        (4.800407132, 1, 4.093920184),
        (0.751807476, 1, 3.607947046),
        (-3.921076206, 1, 2.874138435),
        (-0.885521483, 1, -3.409620358),
        (-13.059614905, 1, -13.351360877),
        (-11.005200654, 1, -15.572696285),
        (-13.307468513, 1, -17.501730178),
        (-15.408041458, 1, -15.230485682),
    ]]
    fillet(fillet_4_edges, radius=FILLET_4_R)

    # 圆角5
    fillet_5_edges = [part.edges().sort_by_distance(p)[0] for p in [
        (-47, 1, -27),
        (47, 1, -27),
    ]]
    fillet(fillet_5_edges, radius=FILLET_5_R)


solid = part.part
